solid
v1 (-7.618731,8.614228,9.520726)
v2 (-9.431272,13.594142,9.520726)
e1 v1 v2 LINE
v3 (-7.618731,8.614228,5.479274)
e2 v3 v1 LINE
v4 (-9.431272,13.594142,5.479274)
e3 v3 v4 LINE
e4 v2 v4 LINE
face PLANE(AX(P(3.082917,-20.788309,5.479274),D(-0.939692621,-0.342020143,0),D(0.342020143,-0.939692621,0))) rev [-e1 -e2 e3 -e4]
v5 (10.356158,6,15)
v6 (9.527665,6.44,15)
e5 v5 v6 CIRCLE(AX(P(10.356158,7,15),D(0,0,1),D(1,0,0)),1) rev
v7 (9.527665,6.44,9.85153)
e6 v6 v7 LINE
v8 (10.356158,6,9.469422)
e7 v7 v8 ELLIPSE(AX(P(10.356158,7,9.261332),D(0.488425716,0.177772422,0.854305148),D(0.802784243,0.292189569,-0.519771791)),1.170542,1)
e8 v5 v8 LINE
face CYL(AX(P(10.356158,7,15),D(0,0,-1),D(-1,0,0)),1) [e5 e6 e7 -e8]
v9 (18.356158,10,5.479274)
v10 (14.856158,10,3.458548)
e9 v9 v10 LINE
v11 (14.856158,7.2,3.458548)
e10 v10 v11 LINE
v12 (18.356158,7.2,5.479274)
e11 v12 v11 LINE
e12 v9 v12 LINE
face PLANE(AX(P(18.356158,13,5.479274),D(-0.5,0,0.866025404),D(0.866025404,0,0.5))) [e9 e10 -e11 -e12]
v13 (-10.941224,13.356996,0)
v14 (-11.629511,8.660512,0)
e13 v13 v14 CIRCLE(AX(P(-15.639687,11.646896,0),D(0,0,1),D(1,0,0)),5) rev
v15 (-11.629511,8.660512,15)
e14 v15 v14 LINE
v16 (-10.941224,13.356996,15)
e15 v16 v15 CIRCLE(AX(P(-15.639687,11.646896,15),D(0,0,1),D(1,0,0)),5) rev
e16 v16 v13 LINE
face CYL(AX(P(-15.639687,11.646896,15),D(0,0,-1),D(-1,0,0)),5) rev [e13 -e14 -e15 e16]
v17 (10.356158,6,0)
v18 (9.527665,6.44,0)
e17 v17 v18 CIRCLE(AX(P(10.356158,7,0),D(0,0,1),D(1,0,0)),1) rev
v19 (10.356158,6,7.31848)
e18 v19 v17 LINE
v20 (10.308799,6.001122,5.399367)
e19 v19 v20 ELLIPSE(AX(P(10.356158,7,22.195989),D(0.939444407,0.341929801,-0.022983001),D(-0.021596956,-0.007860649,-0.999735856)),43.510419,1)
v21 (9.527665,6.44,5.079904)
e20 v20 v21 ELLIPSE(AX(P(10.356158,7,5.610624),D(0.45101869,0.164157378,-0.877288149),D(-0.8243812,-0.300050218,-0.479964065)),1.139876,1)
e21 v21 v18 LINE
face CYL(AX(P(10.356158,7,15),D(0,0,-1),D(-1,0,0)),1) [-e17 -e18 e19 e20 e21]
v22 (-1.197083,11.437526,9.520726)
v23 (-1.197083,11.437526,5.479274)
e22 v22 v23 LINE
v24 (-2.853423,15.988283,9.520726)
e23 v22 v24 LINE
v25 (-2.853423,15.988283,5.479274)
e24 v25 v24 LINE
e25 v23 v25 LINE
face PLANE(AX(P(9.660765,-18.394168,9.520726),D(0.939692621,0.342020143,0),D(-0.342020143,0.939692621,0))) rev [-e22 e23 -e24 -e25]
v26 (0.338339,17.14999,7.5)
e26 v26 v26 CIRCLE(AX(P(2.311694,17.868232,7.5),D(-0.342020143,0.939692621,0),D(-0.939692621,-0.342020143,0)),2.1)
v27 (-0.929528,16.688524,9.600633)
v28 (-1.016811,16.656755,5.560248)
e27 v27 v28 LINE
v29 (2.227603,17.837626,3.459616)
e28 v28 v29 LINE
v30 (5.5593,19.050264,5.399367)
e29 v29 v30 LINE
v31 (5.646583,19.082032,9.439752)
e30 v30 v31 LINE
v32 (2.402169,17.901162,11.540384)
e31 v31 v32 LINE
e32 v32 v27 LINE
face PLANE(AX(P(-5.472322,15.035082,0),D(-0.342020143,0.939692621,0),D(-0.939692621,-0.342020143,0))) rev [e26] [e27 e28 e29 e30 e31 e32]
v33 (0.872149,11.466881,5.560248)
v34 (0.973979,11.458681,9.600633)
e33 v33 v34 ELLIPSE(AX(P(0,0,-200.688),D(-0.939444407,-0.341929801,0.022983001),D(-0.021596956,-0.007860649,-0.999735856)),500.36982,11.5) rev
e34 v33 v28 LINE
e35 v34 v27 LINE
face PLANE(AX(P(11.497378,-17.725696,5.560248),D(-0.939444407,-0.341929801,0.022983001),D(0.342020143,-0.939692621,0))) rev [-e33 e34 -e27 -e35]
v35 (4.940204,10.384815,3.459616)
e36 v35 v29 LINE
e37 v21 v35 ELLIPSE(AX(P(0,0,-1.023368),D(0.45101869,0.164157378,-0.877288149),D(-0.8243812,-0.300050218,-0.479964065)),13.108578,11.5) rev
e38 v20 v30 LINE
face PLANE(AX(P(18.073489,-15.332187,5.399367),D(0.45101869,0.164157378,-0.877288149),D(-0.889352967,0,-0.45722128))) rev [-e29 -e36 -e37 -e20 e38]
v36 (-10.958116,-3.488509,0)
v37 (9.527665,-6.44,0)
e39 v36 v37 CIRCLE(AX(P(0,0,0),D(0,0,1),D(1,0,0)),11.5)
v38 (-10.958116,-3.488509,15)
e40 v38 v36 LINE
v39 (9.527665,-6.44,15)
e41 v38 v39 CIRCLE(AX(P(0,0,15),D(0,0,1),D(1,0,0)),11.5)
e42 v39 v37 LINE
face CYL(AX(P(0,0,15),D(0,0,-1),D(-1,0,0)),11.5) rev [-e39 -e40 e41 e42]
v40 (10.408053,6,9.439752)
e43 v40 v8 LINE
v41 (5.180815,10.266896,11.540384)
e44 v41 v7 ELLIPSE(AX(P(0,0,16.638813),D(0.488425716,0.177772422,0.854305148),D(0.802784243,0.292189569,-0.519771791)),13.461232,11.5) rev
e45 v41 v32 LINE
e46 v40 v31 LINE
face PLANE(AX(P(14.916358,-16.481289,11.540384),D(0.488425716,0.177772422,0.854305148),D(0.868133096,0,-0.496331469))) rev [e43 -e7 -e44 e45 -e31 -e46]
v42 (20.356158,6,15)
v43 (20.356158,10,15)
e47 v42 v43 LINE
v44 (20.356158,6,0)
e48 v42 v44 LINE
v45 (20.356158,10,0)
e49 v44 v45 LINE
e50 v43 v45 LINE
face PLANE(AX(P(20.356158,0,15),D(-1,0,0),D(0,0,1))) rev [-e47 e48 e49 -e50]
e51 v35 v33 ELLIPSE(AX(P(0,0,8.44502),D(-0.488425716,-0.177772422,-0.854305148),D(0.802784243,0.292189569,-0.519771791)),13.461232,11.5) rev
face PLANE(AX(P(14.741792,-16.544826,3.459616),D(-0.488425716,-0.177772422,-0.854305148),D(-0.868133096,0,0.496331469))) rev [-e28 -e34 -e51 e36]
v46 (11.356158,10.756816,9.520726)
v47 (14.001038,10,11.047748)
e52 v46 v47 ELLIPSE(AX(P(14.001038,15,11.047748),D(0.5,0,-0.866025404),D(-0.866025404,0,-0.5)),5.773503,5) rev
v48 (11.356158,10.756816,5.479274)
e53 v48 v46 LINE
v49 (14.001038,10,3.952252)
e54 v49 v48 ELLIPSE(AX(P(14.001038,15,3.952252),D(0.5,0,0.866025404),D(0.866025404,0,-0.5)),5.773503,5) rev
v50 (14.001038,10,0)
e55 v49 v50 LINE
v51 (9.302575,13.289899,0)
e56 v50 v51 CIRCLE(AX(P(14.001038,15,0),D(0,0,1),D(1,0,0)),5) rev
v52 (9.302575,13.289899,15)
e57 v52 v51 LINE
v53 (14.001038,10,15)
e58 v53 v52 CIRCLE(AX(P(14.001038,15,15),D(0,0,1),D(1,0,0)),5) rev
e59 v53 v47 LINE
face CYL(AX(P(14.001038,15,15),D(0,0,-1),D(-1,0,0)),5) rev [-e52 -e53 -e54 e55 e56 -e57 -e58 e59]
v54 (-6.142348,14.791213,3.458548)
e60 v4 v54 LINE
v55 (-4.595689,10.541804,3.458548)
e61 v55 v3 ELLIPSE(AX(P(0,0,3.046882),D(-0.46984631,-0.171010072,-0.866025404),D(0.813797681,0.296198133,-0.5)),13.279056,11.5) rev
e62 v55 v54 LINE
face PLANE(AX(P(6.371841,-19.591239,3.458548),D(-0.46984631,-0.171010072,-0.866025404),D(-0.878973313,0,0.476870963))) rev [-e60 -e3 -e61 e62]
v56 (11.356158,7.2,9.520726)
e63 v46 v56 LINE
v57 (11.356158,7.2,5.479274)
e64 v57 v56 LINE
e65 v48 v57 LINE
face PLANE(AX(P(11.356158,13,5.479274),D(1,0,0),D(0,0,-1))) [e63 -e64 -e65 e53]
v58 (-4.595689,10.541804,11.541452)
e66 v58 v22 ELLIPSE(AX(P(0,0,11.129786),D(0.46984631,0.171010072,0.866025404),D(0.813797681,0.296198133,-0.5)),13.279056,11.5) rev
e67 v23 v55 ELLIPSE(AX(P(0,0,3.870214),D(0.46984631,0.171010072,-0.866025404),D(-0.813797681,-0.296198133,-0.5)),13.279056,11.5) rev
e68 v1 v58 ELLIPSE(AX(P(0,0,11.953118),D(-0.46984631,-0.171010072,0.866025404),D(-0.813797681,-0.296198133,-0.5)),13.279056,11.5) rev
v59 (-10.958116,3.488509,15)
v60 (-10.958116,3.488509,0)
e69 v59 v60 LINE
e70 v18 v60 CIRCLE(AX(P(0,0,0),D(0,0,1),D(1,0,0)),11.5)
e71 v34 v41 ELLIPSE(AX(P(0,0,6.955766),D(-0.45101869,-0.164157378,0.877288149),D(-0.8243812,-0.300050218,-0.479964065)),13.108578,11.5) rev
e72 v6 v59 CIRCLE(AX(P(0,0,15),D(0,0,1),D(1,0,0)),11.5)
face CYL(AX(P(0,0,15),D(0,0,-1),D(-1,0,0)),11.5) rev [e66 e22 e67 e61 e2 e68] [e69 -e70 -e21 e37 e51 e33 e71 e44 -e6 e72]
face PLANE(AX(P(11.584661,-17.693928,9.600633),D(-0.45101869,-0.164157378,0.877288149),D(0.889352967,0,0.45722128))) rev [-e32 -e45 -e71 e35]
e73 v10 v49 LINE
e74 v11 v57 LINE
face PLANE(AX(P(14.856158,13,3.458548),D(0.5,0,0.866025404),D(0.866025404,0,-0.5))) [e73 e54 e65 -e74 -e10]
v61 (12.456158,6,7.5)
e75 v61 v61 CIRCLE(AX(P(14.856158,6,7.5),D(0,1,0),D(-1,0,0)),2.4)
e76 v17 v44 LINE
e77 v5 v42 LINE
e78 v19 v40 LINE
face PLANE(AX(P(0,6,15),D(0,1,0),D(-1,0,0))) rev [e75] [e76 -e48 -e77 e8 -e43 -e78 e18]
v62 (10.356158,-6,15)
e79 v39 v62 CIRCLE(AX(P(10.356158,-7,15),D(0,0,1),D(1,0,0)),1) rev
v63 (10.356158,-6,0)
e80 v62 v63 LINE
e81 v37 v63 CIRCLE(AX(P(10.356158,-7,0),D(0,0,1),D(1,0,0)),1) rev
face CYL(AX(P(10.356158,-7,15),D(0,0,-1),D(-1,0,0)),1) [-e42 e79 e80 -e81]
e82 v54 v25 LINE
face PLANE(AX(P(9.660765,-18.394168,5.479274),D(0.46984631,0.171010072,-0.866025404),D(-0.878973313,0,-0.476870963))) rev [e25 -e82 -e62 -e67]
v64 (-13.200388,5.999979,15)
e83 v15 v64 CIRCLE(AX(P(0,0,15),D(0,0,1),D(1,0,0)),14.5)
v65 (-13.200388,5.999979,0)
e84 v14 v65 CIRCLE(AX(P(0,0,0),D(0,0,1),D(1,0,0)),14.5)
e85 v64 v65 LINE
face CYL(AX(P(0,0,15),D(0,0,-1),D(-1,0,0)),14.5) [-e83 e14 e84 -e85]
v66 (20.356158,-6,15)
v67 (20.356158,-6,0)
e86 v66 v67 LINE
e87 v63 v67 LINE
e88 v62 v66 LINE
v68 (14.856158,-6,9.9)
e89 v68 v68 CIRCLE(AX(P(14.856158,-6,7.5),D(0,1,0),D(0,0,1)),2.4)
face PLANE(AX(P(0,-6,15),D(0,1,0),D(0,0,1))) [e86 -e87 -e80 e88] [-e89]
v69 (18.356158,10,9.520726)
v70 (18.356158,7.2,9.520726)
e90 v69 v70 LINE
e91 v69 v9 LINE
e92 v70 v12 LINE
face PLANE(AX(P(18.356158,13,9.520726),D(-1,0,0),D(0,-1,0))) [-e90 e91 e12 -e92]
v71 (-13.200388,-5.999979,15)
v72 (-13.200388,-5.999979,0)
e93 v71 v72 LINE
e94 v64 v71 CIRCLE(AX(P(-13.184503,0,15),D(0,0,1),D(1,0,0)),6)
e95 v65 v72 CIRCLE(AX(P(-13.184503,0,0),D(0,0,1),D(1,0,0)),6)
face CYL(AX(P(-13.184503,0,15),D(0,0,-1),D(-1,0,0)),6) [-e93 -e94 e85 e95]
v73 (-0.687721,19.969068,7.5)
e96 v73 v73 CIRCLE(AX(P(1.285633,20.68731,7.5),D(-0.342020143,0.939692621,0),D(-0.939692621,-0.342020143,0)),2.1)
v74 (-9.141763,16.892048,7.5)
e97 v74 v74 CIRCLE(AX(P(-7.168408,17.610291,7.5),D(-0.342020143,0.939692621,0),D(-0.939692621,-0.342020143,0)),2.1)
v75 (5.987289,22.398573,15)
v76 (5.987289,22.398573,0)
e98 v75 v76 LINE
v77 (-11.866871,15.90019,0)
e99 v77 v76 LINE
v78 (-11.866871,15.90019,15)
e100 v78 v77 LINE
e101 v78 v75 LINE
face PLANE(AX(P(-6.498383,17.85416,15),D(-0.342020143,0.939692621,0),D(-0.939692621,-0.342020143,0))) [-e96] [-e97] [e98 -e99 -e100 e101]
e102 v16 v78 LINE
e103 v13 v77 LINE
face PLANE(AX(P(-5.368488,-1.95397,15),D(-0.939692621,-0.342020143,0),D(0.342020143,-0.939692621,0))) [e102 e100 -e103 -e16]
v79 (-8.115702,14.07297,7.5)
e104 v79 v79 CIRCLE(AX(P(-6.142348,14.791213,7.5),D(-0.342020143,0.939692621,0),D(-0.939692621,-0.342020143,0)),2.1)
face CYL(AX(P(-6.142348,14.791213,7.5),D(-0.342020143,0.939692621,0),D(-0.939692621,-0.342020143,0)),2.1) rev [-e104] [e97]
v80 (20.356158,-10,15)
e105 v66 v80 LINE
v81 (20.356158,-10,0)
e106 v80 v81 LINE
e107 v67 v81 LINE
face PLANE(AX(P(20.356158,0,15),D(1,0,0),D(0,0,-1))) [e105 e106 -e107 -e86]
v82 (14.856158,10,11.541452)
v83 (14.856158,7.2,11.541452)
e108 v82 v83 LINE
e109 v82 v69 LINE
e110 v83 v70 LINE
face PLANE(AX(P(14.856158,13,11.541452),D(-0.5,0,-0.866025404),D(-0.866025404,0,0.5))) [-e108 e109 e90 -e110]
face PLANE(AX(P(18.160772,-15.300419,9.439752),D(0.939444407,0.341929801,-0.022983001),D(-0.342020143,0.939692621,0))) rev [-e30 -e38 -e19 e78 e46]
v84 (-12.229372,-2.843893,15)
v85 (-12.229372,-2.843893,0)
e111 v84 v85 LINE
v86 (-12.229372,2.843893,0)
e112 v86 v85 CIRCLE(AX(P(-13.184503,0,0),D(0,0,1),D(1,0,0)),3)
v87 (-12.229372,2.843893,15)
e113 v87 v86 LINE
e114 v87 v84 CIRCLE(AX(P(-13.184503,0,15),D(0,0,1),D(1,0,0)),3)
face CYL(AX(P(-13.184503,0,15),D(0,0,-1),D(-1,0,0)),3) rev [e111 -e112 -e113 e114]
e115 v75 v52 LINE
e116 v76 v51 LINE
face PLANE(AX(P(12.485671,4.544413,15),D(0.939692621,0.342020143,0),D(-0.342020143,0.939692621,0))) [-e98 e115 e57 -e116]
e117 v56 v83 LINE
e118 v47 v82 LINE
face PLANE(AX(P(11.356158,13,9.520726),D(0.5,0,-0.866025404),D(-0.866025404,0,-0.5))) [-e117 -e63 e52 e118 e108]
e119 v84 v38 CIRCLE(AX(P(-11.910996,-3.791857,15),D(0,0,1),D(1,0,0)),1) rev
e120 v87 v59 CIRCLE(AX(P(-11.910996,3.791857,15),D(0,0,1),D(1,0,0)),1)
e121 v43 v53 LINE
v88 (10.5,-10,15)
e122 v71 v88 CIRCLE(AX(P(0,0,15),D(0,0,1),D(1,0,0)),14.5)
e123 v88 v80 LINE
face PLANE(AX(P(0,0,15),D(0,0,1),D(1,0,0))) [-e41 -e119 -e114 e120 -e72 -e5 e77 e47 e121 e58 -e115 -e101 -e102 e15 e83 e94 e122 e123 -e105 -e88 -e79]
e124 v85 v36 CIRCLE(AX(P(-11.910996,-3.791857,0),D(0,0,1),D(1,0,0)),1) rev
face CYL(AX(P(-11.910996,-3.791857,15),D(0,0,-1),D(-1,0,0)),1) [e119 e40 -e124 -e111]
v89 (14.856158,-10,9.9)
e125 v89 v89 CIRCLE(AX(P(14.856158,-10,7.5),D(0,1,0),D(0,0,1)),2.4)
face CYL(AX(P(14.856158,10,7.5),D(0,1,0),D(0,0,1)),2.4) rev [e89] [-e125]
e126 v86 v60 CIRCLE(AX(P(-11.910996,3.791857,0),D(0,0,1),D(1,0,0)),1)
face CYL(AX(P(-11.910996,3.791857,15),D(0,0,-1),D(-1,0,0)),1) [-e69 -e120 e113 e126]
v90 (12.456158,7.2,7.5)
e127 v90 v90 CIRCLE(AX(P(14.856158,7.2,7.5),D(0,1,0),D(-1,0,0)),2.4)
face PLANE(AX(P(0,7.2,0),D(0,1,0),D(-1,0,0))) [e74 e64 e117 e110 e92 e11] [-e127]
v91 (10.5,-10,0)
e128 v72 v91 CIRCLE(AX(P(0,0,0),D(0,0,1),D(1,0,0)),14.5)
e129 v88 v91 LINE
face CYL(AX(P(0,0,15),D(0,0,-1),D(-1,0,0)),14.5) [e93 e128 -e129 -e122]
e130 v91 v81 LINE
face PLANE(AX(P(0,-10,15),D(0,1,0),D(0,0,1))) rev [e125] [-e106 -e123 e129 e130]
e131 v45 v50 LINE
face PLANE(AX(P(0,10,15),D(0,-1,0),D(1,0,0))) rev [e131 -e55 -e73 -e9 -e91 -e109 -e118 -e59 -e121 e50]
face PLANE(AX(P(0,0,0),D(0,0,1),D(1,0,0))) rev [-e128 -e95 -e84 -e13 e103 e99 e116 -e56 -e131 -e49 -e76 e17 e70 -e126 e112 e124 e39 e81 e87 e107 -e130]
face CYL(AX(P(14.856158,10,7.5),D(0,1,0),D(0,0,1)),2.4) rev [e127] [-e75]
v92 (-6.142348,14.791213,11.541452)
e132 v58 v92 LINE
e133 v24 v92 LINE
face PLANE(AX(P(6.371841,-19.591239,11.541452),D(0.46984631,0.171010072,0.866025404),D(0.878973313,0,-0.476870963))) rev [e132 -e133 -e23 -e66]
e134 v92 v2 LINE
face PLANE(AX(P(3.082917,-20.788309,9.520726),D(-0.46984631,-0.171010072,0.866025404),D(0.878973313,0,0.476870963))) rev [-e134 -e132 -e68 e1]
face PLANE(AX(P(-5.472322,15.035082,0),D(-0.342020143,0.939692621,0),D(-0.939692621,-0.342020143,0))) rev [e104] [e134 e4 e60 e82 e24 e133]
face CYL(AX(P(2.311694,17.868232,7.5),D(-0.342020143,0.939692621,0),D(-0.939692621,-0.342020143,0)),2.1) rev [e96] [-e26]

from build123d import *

# Parameters (mm, degrees)
BOSS_EXTRU_1_DEPTH           = 15
ENL_V_MAT_EXTRU_1_DEPTH      = 3
ENL_V_MAT_EXTRU_1_DEPTH_BACK = 2.8
D_GAGEMENT_M42_D             = 4.8
ENL_V_MAT_EXTRU_2_REACH      = 46.643
ESQUISSE11_W                 = 17.14444817
ESQUISSE11_H                 = 8.906875476
ESQUISSE11_R                 = 2.1
BOSS_EXTRU_2_DEPTH           = 3


# Read off the part's stored shape, not the designer's step: Boss.-Extru.1
with BuildPart() as part:
    # Boss.-Extru.1 outline → Boss.-Extru.1 (new body)
    with BuildSketch(Plane.XY):
        with BuildLine():
            Line((5.987288652, 22.39857253), (-11.866871143, 15.900189807))
            Line((-11.866871143, 15.900189807), (-10.941224384, 13.356996238))
            ThreePointArc((-10.941224384, 13.356996238), (-10.69253266, 10.921872002), (-11.629511209, 8.660512054))
            ThreePointArc((-11.629511209, 8.660512054), (-12.486015657, 7.372205437), (-13.200388341, 5.99997897))
            ThreePointArc((-13.200388341, 5.99997897), (-19.184502611, 0), (-13.200388341, -5.99997897))
            ThreePointArc((-13.200388341, -5.99997897), (-2.413103056, -14.297794713), (10.5, -10))
            Line((10.5, -10), (20.356157589, -10))
            Line((20.356157589, -10), (20.356157589, -6))
            Line((20.356157589, -6), (10.356157589, -6))
            ThreePointArc((10.356157589, -6), (9.887116013, -6.116823913), (9.527664982, -6.44))
            ThreePointArc((9.527664982, -6.44), (-1.63993081, -11.38247016), (-10.958116089, -3.488508533))
            ThreePointArc((-10.958116089, -3.488508533), (-11.458744879, -2.899966328), (-12.229372464, -2.843892826))
            ThreePointArc((-12.229372464, -2.843892826), (-16.184502611, 0), (-12.229372464, 2.843892826))
            ThreePointArc((-12.229372464, 2.843892826), (-11.458744879, 2.899966328), (-10.958116089, 3.488508533))
            ThreePointArc((-10.958116089, 3.488508533), (-1.63993081, 11.38247016), (9.527664982, 6.44))
            ThreePointArc((9.527664982, 6.44), (9.887116013, 6.116823913), (10.356157589, 6))
            Line((10.356157589, 6), (20.356157589, 6))
            Line((20.356157589, 6), (20.356157589, 10))
            Line((20.356157589, 10), (14.001037691, 10))
            ThreePointArc((14.001037691, 10), (11.133155509, 10.904239779), (9.302574587, 13.289899283))
            Line((9.302574587, 13.289899283), (5.987288652, 22.39857253))
        make_face()
    extrude(amount=BOSS_EXTRU_1_DEPTH)

    # Esquisse5 → Enlèv. mat.-Extru.1 (cut, two sides: drawn at the far end of the back side and taken through both)
    with BuildSketch(Plane(origin=(0, 10, 0), x_dir=(1, 0, 0), z_dir=(0, 1, 0)).offset(-ENL_V_MAT_EXTRU_1_DEPTH_BACK)):
        Polygon((18.356157589, -9.520725942), (18.356157589, -5.479274058), (14.856157589, -3.458548116), (11.356157589, -5.479274058), (11.356157589, -9.520725942), (14.856157589, -11.541451884), align=None)
    extrude(amount=ENL_V_MAT_EXTRU_1_DEPTH + ENL_V_MAT_EXTRU_1_DEPTH_BACK, mode=Mode.SUBTRACT)

    # Dégagement M42 (through all)
    with Locations(Plane(origin=(0, 10, 0), x_dir=(1, 0, 0), z_dir=(0, 1, 0))):
        with Locations((14.856157589, -7.5)):
            Hole(D_GAGEMENT_M42_D / 2)

    # Esquisse10 → Enlèv. mat.-Extru.2 (cut, up to next)
    with BuildSketch(Plane(origin=(-6.498382723, 17.854159795, 0), x_dir=(0.9396926207859082, 0.3420201433256695, 0), z_dir=(-0.3420201433256695, 0.9396926207859082, 0)), mode=Mode.PRIVATE) as enl_v_mat_extru_2_sk1:
        Polygon((-4.213026048, -9.520725942), (-0.713026048, -11.541451884), (2.786973952, -9.520725942), (2.786973952, -5.479274058), (-0.713026048, -3.458548116), (-4.213026048, -5.479274058), align=None)
    enl_v_mat_extru_2_tool1 = extrude(enl_v_mat_extru_2_sk1.sketch, amount=-ENL_V_MAT_EXTRU_2_REACH, mode=Mode.PRIVATE) & part.part
    # Esquisse10 → Enlèv. mat.-Extru.2 (cut, up to next)
    with BuildSketch(Plane(origin=(-6.498382723, 17.854159795, 0), x_dir=(0.9396926207859082, 0.3420201433256695, 0), z_dir=(-0.3420201433256695, 0.9396926207859082, 0)), mode=Mode.PRIVATE) as enl_v_mat_extru_2_sk2:
        Polygon((11.832491793, -9.439751676), (11.739607101, -5.399367318), (8.194089259, -3.459615641), (4.74145611, -5.560248324), (4.834340802, -9.600632682), (8.379858644, -11.540384359), align=None)
    enl_v_mat_extru_2_tool2 = extrude(enl_v_mat_extru_2_sk2.sketch, amount=-ENL_V_MAT_EXTRU_2_REACH, mode=Mode.PRIVATE) & part.part
    add(enl_v_mat_extru_2_tool1.solids().sort_by_distance((-7.168408, 17.610291, 7.5))[0], mode=Mode.SUBTRACT)
    add(enl_v_mat_extru_2_tool2.solids().sort_by_distance((1.288826, 20.688472, 7.5))[0], mode=Mode.SUBTRACT)

    # Esquisse11 → Boss.-Extru.2 (add)
    with BuildSketch(Plane(origin=(-6.498382723, 17.854159795, 0), x_dir=(0.9396926207859082, 0.3420201433256694, 0), z_dir=(-0.3420201433256694, 0.9396926207859083, 0))):
        with Locations((3.831914323, -7.577227244)):
            Rectangle(ESQUISSE11_W, ESQUISSE11_H)
        with Locations(Location((-0.713026048, -7.5, 0), (0, 0, 180))):
            Circle(ESQUISSE11_R, mode=Mode.SUBTRACT)
        with Locations(Location((8.283576678, -7.5, 0), (0, 0, 180))):
            Circle(ESQUISSE11_R, mode=Mode.SUBTRACT)
    extrude(amount=-BOSS_EXTRU_2_DEPTH)


solid = part.part
